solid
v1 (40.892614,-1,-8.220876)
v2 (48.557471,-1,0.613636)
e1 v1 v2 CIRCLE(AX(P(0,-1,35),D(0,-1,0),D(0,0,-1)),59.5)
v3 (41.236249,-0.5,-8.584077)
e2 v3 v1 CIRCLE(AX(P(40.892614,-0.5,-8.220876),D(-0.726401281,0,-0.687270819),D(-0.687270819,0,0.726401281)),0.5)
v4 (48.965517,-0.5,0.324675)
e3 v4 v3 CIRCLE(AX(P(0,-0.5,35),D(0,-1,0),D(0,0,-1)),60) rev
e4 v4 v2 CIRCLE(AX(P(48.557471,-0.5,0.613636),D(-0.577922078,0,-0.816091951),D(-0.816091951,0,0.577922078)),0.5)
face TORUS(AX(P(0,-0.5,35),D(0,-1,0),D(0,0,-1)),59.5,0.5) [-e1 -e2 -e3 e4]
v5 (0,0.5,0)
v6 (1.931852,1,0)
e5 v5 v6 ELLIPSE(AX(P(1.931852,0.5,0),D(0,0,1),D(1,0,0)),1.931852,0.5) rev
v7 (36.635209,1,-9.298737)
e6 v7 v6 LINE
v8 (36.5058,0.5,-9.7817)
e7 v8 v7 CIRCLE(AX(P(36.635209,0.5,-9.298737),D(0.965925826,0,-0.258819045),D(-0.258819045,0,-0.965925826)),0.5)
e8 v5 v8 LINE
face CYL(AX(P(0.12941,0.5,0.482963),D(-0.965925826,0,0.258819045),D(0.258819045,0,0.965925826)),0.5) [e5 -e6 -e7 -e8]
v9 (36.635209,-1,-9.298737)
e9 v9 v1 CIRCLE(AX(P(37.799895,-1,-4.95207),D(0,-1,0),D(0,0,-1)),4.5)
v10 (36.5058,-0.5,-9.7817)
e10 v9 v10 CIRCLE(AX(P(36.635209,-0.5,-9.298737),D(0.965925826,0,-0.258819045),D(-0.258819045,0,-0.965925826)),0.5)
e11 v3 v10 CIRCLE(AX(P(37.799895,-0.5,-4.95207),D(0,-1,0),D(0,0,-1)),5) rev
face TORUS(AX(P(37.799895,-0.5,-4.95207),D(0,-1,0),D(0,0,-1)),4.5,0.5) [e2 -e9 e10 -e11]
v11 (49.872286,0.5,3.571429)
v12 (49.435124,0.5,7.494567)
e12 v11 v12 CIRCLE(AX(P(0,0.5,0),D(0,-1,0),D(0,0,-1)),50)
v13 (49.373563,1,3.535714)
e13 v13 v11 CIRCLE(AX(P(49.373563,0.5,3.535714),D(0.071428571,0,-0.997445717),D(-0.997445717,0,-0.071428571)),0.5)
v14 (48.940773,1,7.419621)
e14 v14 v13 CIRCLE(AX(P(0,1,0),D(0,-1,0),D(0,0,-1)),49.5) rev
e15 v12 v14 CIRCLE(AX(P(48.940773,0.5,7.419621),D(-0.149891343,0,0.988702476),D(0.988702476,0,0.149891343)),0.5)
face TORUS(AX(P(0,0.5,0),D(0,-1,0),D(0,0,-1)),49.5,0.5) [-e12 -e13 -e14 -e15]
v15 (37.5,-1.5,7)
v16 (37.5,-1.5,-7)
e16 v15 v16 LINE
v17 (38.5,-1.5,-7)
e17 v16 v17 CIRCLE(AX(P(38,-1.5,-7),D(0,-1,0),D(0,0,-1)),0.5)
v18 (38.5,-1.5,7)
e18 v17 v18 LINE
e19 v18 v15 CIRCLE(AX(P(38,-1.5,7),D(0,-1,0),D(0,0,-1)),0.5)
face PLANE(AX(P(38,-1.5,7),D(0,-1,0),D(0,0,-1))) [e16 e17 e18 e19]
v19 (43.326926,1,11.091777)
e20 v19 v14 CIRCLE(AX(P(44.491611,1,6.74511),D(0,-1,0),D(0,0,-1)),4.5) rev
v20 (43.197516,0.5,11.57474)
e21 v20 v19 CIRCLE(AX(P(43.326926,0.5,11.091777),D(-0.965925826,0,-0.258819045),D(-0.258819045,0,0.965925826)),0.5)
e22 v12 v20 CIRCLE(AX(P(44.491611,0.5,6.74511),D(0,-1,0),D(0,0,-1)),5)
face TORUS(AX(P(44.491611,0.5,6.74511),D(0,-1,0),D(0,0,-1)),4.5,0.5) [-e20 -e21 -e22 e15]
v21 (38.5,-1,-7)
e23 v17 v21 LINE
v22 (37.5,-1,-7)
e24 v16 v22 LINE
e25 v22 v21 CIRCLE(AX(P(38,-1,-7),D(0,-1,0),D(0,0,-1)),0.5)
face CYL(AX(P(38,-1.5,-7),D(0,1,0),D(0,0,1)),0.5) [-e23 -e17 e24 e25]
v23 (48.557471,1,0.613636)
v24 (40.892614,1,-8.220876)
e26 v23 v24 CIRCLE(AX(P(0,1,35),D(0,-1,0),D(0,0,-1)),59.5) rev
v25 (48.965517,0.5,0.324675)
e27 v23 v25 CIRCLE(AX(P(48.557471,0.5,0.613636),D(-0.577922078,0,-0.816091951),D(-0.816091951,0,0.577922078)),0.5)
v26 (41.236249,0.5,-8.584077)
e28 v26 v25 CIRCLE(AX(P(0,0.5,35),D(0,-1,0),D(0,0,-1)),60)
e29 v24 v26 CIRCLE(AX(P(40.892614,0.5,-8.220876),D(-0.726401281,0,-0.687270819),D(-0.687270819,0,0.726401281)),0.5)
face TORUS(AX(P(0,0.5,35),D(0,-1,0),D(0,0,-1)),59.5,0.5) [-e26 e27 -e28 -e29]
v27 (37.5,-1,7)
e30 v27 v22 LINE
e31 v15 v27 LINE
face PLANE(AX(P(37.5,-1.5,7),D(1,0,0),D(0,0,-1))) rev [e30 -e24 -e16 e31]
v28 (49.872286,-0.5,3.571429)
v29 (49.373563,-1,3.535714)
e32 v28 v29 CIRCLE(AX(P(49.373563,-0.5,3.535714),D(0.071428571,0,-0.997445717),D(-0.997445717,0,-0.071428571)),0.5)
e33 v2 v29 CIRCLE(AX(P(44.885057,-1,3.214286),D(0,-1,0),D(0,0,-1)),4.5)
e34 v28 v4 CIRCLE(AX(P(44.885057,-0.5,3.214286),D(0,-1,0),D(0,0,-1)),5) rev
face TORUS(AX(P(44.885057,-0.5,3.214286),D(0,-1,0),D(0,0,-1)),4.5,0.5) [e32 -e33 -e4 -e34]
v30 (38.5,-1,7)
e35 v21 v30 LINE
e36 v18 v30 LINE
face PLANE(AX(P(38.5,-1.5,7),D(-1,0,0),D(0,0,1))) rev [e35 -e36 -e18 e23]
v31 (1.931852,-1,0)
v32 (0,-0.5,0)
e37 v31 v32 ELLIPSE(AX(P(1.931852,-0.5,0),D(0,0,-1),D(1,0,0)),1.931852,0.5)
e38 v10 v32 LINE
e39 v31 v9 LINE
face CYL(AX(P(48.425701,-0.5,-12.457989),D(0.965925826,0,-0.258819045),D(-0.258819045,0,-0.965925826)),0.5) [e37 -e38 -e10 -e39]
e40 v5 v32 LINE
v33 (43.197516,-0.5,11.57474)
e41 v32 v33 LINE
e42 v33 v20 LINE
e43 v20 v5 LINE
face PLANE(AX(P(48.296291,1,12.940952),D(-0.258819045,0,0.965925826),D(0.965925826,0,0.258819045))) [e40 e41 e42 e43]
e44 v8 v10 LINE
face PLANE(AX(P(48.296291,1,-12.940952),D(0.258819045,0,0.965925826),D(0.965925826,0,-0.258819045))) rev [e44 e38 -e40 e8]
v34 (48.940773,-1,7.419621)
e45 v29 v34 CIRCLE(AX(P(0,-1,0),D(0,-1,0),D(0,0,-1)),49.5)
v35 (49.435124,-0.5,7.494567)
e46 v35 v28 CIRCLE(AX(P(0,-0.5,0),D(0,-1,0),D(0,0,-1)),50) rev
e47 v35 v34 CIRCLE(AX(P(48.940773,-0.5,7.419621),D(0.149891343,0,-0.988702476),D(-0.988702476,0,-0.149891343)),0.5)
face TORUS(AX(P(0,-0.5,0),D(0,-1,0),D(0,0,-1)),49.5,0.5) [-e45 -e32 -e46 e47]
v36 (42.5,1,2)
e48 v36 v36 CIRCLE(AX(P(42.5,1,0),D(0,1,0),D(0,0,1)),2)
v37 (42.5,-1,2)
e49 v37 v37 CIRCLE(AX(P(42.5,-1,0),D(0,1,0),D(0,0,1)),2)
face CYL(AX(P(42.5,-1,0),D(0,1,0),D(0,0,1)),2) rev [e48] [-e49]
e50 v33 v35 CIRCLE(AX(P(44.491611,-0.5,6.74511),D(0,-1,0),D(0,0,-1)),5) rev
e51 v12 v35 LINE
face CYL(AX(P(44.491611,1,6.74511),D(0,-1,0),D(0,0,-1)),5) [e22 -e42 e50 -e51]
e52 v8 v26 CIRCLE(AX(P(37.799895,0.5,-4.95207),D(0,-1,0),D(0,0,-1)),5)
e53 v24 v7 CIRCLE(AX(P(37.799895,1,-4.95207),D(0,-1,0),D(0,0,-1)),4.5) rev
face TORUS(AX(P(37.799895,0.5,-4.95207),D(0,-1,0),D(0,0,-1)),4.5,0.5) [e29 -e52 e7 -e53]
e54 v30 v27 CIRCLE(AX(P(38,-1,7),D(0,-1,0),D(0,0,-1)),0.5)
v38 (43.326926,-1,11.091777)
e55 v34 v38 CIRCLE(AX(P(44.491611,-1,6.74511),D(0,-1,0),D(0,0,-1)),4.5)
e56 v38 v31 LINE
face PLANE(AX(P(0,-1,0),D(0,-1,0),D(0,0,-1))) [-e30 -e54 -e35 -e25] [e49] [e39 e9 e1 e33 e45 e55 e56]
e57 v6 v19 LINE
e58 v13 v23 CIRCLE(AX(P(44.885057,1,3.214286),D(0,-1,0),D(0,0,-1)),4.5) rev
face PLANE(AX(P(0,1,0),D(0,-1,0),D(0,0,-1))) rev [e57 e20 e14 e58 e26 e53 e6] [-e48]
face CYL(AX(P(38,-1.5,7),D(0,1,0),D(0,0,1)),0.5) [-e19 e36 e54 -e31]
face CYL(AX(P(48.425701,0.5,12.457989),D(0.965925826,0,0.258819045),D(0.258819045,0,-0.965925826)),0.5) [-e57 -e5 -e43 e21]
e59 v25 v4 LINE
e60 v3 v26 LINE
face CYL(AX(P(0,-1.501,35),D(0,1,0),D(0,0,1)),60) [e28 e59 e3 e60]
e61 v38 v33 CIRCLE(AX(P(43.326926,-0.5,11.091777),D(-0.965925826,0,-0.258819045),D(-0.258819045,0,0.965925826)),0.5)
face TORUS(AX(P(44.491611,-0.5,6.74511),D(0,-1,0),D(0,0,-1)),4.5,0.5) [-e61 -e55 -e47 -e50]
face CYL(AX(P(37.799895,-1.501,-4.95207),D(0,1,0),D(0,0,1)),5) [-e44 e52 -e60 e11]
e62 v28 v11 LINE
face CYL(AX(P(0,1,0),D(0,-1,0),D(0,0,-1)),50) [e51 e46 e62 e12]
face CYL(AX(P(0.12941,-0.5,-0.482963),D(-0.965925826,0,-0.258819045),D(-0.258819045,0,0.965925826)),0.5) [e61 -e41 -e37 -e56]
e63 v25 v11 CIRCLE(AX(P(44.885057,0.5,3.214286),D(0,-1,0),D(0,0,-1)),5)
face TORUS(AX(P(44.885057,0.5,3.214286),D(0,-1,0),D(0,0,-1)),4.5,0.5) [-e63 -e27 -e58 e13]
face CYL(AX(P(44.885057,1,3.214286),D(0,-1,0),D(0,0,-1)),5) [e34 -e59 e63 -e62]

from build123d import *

# Parameters (mm, degrees)
BOSS_EXTRUDE2_DEPTH = 1
SKETCH2_R           = 2
CUT_EXTRUDE1_DEPTH  = 52.686248125
BOSS_EXTRUDE3_DEPTH = 0.5
CUT_EXTRUDE3_START  = -2
CUT_EXTRUDE3_DEPTH  = 2
FILLET1_R           = 5
FILLET2_R           = 0.5


# Read off the part's stored shape, not the designer's step: Cut-Extrude3
with BuildPart() as part:
    # Sketch1 → Boss-Extrude2 (new, symmetric)
    with BuildSketch(Plane(origin=(0, 0, 0), x_dir=(1, 0, 0), z_dir=(0, 1, 0))):
        with BuildLine():
            Line((48.296291314, -12.940952255), (0, 0))
            Line((0, 0), (48.296291314, 12.940952255))
            ThreePointArc((48.296291314, 12.940952255), (50, 0), (48.296291314, -12.940952255))
        make_face()
    extrude(amount=BOSS_EXTRUDE2_DEPTH, both=True)

    # Sketch2 → Cut-Extrude1 (cut, through all)
    with BuildSketch(Plane(origin=(0, 1, 0), x_dir=(1, 0, 0), z_dir=(0, 1, 0))):
        with Locations(Location((42.5, 0, 0), (0, 0, 270))):
            Circle(SKETCH2_R)
    extrude(amount=-CUT_EXTRUDE1_DEPTH, mode=Mode.SUBTRACT)

    # Sketch3 → Boss-Extrude3 (add)
    with BuildSketch(Plane(origin=(0, -1, 0), x_dir=(-1, 0, 0), z_dir=(0, -1, 0))):
        with BuildLine():
            Line((-38.5, -7), (-38.5, 7))
            ThreePointArc((-38.5, 7), (-38, 7.5), (-37.5, 7))
            Line((-37.5, 7), (-37.5, -7))
            ThreePointArc((-37.5, -7), (-38, -7.5), (-38.5, -7))
        make_face()
    extrude(amount=BOSS_EXTRUDE3_DEPTH)

    # Cut-Extrude3 outline → Cut-Extrude3 (cut)
    with BuildSketch(Plane(origin=(0, 1, 0), x_dir=(1, 0, 0), z_dir=(0, 1, 0)).offset(CUT_EXTRUDE3_START)):
        with BuildLine():
            ThreePointArc((39.129720832, 10.484777097), (44.969397941, 4.720942194), (49.96810207, -1.785714286))
            ThreePointArc((49.96810207, -1.785714286), (49.680896013, 5.639908806), (48.296291314, 12.940952255))
            Line((48.296291314, 12.940952255), (39.129720832, 10.484777097))
        make_face()
    extrude(amount=CUT_EXTRUDE3_DEPTH, mode=Mode.SUBTRACT)

    # Fillet1
    fillet1_edges = [part.edges().sort_by_distance(p)[0] for p in [
        (39.129720832, 0, -10.484777097),
        (49.96810207, 0, 1.785714286),
        (48.296291314, 0, 12.940952255),
    ]]
    fillet(fillet1_edges, radius=FILLET1_R)

    # Fillet2
    fillet2_edges = [part.edges().sort_by_distance(p)[0] for p in [
        (18.252899917, -1, -4.890849792),
        (18.252899917, 1, -4.890849792),
        (45.320316883, -1, -4.32008237),
        (49.692435611, -1, 5.537313704),
        (21.598758088, -1, 5.787369787),
        (47.228674266, -1, 10.929424828),
        (49.700770587, -1, 1.869330184),
        (39.027043508, -1, -9.799142423),
        (45.320316883, 1, -4.32008237),
        (21.598758088, 1, 5.787369787),
        (49.692435611, 1, 5.537313704),
        (47.228674266, 1, 10.929424828),
        (49.700770587, 1, 1.869330184),
        (39.027043508, 1, -9.799142423),
    ]]
    fillet(fillet2_edges, radius=FILLET2_R)


solid = part.part
